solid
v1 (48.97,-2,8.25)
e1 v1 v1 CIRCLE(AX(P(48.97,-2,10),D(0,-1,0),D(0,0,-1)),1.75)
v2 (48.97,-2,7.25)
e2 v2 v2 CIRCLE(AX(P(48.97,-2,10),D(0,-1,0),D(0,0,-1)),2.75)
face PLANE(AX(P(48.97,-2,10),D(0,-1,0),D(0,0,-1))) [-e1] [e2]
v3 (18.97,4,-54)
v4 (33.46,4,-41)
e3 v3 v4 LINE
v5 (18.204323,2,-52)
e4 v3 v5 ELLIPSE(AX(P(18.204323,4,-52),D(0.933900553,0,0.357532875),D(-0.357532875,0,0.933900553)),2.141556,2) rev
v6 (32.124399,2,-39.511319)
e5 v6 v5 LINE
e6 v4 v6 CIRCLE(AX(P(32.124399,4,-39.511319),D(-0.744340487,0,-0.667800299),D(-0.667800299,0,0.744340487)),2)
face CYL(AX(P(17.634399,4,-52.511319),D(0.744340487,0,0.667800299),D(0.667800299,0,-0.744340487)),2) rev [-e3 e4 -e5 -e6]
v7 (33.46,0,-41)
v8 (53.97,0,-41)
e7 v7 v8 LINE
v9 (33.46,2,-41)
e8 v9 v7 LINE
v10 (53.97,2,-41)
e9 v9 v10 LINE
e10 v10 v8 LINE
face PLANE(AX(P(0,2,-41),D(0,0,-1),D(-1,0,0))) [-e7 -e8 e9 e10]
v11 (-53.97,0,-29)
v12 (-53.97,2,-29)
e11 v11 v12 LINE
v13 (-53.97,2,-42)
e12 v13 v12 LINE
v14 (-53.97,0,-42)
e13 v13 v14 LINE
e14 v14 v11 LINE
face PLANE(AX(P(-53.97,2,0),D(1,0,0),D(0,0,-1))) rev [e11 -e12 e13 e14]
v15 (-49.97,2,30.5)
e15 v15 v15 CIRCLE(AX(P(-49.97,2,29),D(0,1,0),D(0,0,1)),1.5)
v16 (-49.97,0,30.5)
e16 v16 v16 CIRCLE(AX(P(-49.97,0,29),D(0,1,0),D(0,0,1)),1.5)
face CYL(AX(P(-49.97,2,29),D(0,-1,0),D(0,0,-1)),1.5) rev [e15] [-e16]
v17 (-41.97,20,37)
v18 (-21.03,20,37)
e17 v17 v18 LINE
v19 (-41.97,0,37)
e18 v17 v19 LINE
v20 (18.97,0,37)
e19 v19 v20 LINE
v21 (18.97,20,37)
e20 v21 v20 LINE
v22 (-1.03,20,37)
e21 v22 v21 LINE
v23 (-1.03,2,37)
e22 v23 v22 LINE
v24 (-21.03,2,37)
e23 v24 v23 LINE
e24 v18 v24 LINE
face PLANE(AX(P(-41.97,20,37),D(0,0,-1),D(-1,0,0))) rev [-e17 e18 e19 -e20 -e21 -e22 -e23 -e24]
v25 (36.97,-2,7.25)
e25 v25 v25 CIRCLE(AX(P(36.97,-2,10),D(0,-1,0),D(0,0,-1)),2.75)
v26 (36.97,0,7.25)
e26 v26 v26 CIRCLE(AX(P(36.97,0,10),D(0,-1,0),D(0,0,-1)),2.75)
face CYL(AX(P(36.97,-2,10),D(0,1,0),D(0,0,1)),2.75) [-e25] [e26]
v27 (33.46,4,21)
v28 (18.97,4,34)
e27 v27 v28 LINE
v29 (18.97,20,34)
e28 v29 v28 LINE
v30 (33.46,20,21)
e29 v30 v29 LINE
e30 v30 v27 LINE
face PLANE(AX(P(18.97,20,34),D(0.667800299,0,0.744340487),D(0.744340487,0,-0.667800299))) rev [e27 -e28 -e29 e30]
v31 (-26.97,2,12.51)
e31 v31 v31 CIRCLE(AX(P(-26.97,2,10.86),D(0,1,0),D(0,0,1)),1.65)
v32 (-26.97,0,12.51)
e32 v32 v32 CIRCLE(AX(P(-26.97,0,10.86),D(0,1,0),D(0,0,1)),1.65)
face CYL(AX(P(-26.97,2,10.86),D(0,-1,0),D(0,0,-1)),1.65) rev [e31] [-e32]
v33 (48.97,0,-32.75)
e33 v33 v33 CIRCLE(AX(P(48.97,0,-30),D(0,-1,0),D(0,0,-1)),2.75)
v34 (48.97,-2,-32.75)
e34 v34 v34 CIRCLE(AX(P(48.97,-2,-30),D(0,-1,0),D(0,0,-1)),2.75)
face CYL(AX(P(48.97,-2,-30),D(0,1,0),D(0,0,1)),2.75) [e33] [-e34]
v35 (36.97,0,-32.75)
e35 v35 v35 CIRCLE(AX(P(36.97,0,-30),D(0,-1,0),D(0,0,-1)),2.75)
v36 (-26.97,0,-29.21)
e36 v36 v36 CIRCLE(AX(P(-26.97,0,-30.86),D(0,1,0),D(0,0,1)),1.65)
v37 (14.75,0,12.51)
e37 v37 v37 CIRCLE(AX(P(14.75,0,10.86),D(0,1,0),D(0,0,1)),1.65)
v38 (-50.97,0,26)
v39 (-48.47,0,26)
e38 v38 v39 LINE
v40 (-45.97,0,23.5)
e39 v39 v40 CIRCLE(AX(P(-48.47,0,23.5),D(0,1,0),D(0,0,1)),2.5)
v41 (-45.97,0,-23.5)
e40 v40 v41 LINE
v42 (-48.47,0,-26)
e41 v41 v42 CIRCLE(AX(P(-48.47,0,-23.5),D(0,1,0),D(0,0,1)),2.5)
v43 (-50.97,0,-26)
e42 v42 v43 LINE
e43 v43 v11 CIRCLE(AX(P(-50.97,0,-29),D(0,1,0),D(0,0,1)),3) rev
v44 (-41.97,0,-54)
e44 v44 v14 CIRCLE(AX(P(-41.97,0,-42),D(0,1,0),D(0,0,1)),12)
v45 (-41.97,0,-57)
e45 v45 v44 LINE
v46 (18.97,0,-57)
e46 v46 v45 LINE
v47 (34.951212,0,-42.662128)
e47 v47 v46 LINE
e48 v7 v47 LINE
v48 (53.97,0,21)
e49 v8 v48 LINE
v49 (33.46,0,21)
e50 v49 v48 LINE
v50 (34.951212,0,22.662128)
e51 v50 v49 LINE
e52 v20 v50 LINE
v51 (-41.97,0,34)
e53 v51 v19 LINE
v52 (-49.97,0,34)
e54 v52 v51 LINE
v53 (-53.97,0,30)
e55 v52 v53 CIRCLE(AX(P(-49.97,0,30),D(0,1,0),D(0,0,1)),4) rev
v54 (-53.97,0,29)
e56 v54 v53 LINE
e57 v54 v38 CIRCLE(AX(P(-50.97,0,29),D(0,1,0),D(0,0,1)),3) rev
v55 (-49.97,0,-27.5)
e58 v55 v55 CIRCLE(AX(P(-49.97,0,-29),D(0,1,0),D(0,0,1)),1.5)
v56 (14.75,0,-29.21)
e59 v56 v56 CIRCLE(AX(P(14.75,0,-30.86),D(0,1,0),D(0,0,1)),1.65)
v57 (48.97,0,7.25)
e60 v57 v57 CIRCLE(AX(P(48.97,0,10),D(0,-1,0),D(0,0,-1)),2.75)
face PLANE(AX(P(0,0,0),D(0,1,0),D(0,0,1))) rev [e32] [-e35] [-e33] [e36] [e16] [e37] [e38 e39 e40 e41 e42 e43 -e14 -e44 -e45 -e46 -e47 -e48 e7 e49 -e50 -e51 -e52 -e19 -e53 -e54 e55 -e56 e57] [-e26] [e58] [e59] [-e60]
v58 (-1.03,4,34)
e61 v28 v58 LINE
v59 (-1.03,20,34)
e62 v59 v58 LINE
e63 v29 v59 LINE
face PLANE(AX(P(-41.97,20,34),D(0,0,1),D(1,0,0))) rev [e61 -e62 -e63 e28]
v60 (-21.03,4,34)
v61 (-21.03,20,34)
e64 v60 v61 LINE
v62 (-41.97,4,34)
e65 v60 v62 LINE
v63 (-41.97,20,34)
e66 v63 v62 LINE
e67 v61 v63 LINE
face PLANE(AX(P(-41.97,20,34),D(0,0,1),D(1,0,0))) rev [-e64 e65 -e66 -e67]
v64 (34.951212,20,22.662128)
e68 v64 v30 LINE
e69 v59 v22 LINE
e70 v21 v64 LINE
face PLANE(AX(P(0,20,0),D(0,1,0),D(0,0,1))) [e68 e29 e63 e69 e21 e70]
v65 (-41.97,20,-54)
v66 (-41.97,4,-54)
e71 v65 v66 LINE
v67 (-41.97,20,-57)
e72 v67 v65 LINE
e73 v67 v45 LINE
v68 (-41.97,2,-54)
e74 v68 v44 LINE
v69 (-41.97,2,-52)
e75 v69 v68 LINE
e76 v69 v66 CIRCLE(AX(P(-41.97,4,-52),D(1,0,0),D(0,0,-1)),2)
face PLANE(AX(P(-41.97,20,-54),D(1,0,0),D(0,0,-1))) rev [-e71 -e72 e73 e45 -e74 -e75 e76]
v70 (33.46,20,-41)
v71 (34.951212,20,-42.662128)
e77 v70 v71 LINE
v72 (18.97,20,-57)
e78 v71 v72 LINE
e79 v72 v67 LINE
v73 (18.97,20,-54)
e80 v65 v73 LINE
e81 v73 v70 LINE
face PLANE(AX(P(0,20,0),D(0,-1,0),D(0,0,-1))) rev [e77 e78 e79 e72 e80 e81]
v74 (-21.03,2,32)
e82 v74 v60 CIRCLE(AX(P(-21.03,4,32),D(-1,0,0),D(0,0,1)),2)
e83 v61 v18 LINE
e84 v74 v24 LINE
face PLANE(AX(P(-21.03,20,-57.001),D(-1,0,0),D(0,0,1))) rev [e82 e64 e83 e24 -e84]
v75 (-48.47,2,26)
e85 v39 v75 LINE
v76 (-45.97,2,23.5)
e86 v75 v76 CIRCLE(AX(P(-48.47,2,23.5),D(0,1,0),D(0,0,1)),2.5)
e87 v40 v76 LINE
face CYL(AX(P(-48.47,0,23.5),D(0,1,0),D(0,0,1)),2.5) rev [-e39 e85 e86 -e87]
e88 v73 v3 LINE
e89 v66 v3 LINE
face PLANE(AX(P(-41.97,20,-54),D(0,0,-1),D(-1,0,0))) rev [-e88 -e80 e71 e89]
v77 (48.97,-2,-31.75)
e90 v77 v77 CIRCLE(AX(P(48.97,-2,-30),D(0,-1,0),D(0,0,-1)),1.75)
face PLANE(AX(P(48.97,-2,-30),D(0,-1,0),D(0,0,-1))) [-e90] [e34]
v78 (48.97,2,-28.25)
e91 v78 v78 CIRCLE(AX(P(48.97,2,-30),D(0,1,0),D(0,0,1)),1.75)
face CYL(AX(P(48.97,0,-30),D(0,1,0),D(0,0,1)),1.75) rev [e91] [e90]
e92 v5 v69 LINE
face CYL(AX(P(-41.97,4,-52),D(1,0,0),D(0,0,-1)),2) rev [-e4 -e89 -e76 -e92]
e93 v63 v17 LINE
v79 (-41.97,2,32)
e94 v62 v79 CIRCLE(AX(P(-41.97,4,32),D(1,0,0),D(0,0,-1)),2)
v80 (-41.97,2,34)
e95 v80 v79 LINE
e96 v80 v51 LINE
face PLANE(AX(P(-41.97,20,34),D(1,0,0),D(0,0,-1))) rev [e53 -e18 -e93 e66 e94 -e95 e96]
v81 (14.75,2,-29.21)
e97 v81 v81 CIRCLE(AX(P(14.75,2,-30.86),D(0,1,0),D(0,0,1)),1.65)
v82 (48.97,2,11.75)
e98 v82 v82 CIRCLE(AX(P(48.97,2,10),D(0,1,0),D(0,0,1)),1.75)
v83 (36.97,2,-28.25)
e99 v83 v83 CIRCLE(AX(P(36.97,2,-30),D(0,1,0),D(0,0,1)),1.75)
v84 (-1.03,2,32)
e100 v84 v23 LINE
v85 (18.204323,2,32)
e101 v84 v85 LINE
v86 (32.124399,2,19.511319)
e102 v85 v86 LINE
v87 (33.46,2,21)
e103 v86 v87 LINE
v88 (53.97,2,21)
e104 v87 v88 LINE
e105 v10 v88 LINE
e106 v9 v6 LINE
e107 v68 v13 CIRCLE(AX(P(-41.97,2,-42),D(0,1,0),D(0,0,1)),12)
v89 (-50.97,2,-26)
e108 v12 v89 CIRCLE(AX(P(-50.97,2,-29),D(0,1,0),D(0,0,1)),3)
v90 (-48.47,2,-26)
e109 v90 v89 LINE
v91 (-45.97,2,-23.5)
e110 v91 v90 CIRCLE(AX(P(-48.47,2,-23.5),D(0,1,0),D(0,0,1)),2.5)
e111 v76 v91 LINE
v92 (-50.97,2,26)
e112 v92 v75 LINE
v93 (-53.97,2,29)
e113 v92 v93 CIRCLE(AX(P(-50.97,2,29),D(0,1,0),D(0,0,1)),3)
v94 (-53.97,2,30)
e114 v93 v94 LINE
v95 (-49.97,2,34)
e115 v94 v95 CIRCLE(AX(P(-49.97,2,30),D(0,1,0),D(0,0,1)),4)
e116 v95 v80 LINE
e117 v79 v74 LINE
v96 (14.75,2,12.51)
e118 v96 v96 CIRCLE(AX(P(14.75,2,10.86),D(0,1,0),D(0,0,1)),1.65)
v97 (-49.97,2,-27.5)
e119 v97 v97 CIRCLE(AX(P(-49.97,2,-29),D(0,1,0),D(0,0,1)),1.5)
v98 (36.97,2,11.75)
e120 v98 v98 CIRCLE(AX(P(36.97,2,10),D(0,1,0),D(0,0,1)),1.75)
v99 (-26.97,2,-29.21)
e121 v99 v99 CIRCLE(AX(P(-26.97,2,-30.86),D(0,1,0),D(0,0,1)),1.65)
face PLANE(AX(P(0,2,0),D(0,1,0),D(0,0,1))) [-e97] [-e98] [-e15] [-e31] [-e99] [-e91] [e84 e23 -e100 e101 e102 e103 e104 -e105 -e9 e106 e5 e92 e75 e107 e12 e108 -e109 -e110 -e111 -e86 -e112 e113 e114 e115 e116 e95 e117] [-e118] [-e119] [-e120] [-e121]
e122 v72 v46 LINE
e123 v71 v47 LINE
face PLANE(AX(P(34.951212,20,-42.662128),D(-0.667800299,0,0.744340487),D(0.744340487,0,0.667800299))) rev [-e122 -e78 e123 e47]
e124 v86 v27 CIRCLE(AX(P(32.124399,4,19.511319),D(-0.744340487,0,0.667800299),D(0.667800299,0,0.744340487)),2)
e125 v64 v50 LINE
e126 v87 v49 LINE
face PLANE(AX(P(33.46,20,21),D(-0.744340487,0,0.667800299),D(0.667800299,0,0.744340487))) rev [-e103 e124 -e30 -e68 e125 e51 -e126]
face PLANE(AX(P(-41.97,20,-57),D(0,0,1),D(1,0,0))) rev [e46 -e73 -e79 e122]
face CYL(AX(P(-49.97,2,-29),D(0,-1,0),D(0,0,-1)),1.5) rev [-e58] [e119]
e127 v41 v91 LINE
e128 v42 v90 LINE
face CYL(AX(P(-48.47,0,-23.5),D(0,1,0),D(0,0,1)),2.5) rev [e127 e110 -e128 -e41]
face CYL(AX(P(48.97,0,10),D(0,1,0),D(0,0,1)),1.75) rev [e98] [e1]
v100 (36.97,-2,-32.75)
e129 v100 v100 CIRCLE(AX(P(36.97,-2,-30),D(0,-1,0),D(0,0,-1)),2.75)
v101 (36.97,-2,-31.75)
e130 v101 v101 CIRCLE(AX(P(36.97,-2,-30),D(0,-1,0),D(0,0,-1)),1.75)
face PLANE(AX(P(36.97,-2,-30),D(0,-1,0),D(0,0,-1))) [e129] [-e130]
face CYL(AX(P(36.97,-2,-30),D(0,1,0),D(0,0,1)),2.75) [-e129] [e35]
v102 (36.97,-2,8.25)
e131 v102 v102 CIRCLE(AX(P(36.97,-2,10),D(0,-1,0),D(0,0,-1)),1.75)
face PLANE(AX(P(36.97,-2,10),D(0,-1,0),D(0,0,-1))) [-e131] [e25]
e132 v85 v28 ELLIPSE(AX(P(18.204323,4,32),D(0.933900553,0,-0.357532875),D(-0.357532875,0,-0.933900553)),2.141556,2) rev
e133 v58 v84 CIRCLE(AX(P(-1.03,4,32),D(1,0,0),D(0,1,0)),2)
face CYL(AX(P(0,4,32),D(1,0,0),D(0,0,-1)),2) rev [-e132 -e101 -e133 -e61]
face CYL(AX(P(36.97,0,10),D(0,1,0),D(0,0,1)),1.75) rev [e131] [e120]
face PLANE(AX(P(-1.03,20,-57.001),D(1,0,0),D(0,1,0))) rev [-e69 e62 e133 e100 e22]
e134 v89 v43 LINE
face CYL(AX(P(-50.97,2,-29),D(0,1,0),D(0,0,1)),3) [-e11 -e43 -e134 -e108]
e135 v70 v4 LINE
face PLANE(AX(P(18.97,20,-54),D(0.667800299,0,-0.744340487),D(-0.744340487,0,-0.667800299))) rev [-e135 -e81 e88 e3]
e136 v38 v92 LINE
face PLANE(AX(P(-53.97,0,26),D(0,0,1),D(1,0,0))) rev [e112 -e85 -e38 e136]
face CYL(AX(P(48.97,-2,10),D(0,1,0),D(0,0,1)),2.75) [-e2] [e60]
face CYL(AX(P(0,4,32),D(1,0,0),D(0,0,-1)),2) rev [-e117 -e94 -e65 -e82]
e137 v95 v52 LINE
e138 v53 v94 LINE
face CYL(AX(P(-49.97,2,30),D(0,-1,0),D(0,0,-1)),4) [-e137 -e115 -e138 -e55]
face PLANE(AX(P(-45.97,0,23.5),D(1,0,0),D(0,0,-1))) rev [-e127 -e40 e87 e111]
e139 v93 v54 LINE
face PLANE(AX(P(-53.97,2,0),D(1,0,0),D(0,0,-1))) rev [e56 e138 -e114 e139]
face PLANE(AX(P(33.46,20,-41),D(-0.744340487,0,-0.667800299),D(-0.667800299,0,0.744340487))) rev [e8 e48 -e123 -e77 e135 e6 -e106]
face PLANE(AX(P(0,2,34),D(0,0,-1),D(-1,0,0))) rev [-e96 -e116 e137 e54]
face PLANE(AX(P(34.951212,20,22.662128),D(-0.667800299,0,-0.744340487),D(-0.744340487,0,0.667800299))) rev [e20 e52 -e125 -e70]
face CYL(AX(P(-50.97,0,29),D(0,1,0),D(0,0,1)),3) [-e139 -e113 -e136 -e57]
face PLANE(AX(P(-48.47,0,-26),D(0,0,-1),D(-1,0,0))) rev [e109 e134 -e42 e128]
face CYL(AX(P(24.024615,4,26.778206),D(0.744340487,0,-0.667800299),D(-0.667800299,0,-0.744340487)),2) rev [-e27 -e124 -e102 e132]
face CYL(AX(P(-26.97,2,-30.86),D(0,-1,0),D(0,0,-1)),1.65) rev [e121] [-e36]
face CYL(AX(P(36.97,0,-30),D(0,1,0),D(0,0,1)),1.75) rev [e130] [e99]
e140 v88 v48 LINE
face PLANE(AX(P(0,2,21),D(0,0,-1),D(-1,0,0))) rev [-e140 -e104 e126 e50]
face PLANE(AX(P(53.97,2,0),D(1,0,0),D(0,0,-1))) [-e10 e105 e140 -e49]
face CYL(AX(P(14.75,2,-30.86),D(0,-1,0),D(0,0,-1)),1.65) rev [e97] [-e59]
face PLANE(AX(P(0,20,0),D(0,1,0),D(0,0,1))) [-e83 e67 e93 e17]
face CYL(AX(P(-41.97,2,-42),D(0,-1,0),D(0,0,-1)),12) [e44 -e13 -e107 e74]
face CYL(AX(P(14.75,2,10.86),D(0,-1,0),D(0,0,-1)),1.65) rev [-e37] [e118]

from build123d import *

# Parameters (mm, degrees)
CROQUIS1_R              = 1.5
CROQUIS1_R_2            = 1.65
SALIENTE_EXTRUIR1_DEPTH = 2
REDONDEO1_R             = 4
CORTAR_EXTRUIR1_DEPTH   = 77.372514035
REDONDEO2_R             = 3
CROQUIS5_R              = 1.75
CORTAR_EXTRUIR2_DEPTH   = 77.372514035
CROQUIS6_R              = 2.75
CROQUIS6_R_2            = 1.75
SALIENTE_EXTRUIR6_DEPTH = 2
SALIENTE_EXTRUIR7_DEPTH = 20
CORTAR_EXTRUIR3_REACH   = 112.221
CROQUIS8_W              = 20
CROQUIS8_H              = 18
REDONDEO3_R             = 2


with BuildPart() as part:
    # Croquis1 → Saliente-Extruir1 (new body)
    with BuildSketch(Plane(origin=(0, 0, 0), x_dir=(1, 0, 0), z_dir=(0, 1, 0))):
        with BuildLine():
            Line((33.46, 41), (18.97, 54))
            Line((18.97, 54), (-41.97, 54))
            ThreePointArc((-41.97, 54), (-50.455281374, 50.485281374), (-53.97, 42))
            Line((-53.97, 42), (-53.97, -34))
            Line((-53.97, -34), (18.97, -34))
            Line((18.97, -34), (33.46, -21))
            Line((33.46, -21), (53.97, -21))
            Line((53.97, -21), (53.97, 7.59309581))
            Line((53.97, 7.59309581), (53.97, 12.40690419))
            Line((53.97, 12.40690419), (53.97, 41))
            Line((53.97, 41), (33.46, 41))
        make_face()
        with Locations(Location((-49.97, -29, 0), (0, 0, 270))):
            Circle(CROQUIS1_R, mode=Mode.SUBTRACT)
        with Locations(Location((-26.97, -10.86, 0), (0, 0, 270))):
            Circle(CROQUIS1_R_2, mode=Mode.SUBTRACT)
        with Locations(Location((14.75, -10.86, 0), (0, 0, 270))):
            Circle(CROQUIS1_R_2, mode=Mode.SUBTRACT)
        with Locations(Location((-49.97, 29, 0), (0, 0, 270))):
            Circle(CROQUIS1_R, mode=Mode.SUBTRACT)
        with Locations(Location((-26.97, 30.86, 0), (0, 0, 270))):
            Circle(CROQUIS1_R_2, mode=Mode.SUBTRACT)
        with Locations(Location((14.75, 30.86, 0), (0, 0, 270))):
            Circle(CROQUIS1_R_2, mode=Mode.SUBTRACT)
    extrude(amount=SALIENTE_EXTRUIR1_DEPTH)

    # Redondeo1
    redondeo1_edges = [part.edges().sort_by_distance(p)[0] for p in [
        (-53.97, 1, 34),
    ]]
    fillet(redondeo1_edges, radius=REDONDEO1_R)

    # Croquis4 → Cortar-Extruir1 (cut, through all)
    with BuildSketch(Plane(origin=(0, 2, 0), x_dir=(1, 0, 0), z_dir=(0, 1, 0))):
        with BuildLine():
            Line((-53.97, 26), (-53.97, -26))
            Line((-53.97, -26), (-48.47, -26))
            ThreePointArc((-48.47, -26), (-46.702233047, -25.267766953), (-45.97, -23.5))
            Line((-45.97, -23.5), (-45.97, 23.5))
            ThreePointArc((-45.97, 23.5), (-46.702233047, 25.267766953), (-48.47, 26))
            Line((-48.47, 26), (-53.97, 26))
        make_face()
    extrude(amount=-CORTAR_EXTRUIR1_DEPTH, mode=Mode.SUBTRACT)

    # Redondeo2
    redondeo2_edges = [part.edges().sort_by_distance(p)[0] for p in [
        (-53.97, 1, -26),
        (-53.97, 1, 26),
    ]]
    fillet(redondeo2_edges, radius=REDONDEO2_R)

    # Croquis5 → Cortar-Extruir2 (cut, through all)
    with BuildSketch(Plane(origin=(0, 2, 0), x_dir=(1, 0, 0), z_dir=(0, 1, 0))):
        with Locations(Location((36.97, 30, 0), (0, 0, 270))):
            Circle(CROQUIS5_R)
        with Locations(Location((36.97, -10, 0), (0, 0, 270))):
            Circle(CROQUIS5_R)
        with Locations(Location((48.97, 30, 0), (0, 0, 270))):
            Circle(CROQUIS5_R)
        with Locations(Location((48.97, -10, 0), (0, 0, 270))):
            Circle(CROQUIS5_R)
    extrude(amount=-CORTAR_EXTRUIR2_DEPTH, mode=Mode.SUBTRACT)

    # Croquis6 → Saliente-Extruir6 (add)
    # profile 1 of 4: a face of its own
    with BuildSketch(Plane.XZ):
        with Locations(Location((36.97, 10, 0), (0, 0, 270))):
            Circle(CROQUIS6_R)
        with Locations(Location((36.97, 10, 0), (0, 0, 90))):
            Circle(CROQUIS6_R_2, mode=Mode.SUBTRACT)
    # profile 2 of 4: a face of its own
    with BuildSketch(Plane.XZ):
        with Locations(Location((36.97, -30, 0), (0, 0, 270))):
            Circle(CROQUIS6_R)
        with Locations(Location((36.97, -30, 0), (0, 0, 90))):
            Circle(CROQUIS6_R_2, mode=Mode.SUBTRACT)
    # profile 3 of 4: a face of its own
    with BuildSketch(Plane.XZ):
        with Locations(Location((48.97, -30, 0), (0, 0, 270))):
            Circle(CROQUIS6_R)
        with Locations(Location((48.97, -30, 0), (0, 0, 90))):
            Circle(CROQUIS6_R_2, mode=Mode.SUBTRACT)
    # profile 4 of 4: a face of its own
    with BuildSketch(Plane.XZ):
        with Locations(Location((48.97, 10, 0), (0, 0, 270))):
            Circle(CROQUIS6_R)
        with Locations(Location((48.97, 10, 0), (0, 0, 90))):
            Circle(CROQUIS6_R_2, mode=Mode.SUBTRACT)
    extrude(amount=SALIENTE_EXTRUIR6_DEPTH)

    # Croquis7 → Saliente-Extruir7 (add)
    with BuildSketch(Plane(origin=(0, 0, 0), x_dir=(1, 0, 0), z_dir=(0, 1, 0))):
        Polygon((-41.97, -34), (18.97, -34), (33.46, -21), (34.951212399, -22.662128282), (18.97, -37), (-41.97, -37), align=None)
        Polygon((-41.97, 54), (18.97, 54), (33.46, 41), (34.951212399, 42.662128282), (18.97, 57), (-41.97, 57), align=None)
    extrude(amount=SALIENTE_EXTRUIR7_DEPTH)

    # Croquis8 → Cortar-Extruir3 (cut, up to next)
    with BuildSketch(Plane.XY.offset(37), mode=Mode.PRIVATE) as cortar_extruir3_sk1:
        with Locations((-11.03, 11)):
            Rectangle(CROQUIS8_W, CROQUIS8_H)
    cortar_extruir3_tool1 = extrude(cortar_extruir3_sk1.sketch, amount=-CORTAR_EXTRUIR3_REACH, mode=Mode.PRIVATE) & part.part
    add(cortar_extruir3_tool1.solids().sort_by_distance((-11.03, 11, 37))[0], mode=Mode.SUBTRACT)

    # Redondeo3
    # the kernel refuses this fillet: 2 mm, written as the material it adds along each edge
    with BuildSketch(Plane(origin=(-41.97, 2, 34), x_dir=(0, 0, -1), z_dir=(1, 0, 0))) as redondeo3_piece_1:
        with BuildLine():
            CenterArc((REDONDEO3_R, REDONDEO3_R), REDONDEO3_R, 180, 90)
            Line((0, REDONDEO3_R), (0, 0))
            Line((0, 0), (REDONDEO3_R, 0))
        make_face()
    extrude(amount=20.94)
    with BuildSketch(Plane(origin=(-1.03, 2, 34), x_dir=(0, 0, -1), z_dir=(1, 0, 0))) as redondeo3_piece_2_section:
        with BuildLine():
            CenterArc((REDONDEO3_R, REDONDEO3_R), REDONDEO3_R, 180, 90)
            Line((0, REDONDEO3_R), (0, 0))
            Line((0, 0), (REDONDEO3_R, 0))
        make_face()
    redondeo3_piece_2 = extrude(amount=25, mode=Mode.PRIVATE)
    redondeo3_piece_2 = split(redondeo3_piece_2, bisect_by=Plane(origin=(13.795733926, 2.442237096, 38.642198686), z_dir=(-0.6678002989650054, 0, -0.7443404870771505)), keep=Keep.TOP, mode=Mode.PRIVATE)
    add(redondeo3_piece_2)
    with BuildSketch(Plane(origin=(23.97, 2, -54), x_dir=(0, 0, 1), z_dir=(-1, 0, 0))) as redondeo3_piece_3_section:
        with BuildLine():
            CenterArc((REDONDEO3_R, REDONDEO3_R), REDONDEO3_R, 180, 90)
            Line((0, REDONDEO3_R), (0, 0))
            Line((0, 0), (REDONDEO3_R, 0))
        make_face()
    redondeo3_piece_3 = extrude(amount=65.94, mode=Mode.PRIVATE)
    redondeo3_piece_3 = split(redondeo3_piece_3, bisect_by=Plane(origin=(3.244998738, 2.450659897, -68.108006653), z_dir=(-0.6678002989650061, 0, 0.7443404870771497)), keep=Keep.TOP, mode=Mode.PRIVATE)
    add(redondeo3_piece_3)
    with BuildSketch(Plane(origin=(15.248297565, 2, 37.339001495), x_dir=(-0.6678002989650055, 0, -0.7443404870771503), z_dir=(0.7443404870771504, 0, -0.6678002989650055))) as redondeo3_piece_4_section:
        with BuildLine():
            CenterArc((REDONDEO3_R, REDONDEO3_R), REDONDEO3_R, 180, 90)
            Line((0, REDONDEO3_R), (0, 0))
            Line((0, 0), (REDONDEO3_R, 0))
        make_face()
    redondeo3_piece_4 = extrude(amount=24.466897544, mode=Mode.PRIVATE)
    redondeo3_piece_4 = split(redondeo3_piece_4, bisect_by=Plane(origin=(25.546033726, 2.446735878, 34), z_dir=(0, 0, -1)), keep=Keep.TOP, mode=Mode.PRIVATE)
    add(redondeo3_piece_4)
    with BuildSketch(Plane(origin=(33.46, 2, -41), x_dir=(-0.6678002989650058, 0, 0.74434048707715), z_dir=(-0.7443404870771501, 0, -0.6678002989650059))) as redondeo3_piece_5_section:
        with BuildLine():
            CenterArc((REDONDEO3_R, REDONDEO3_R), REDONDEO3_R, 180, 90)
            Line((0, REDONDEO3_R), (0, 0))
            Line((0, 0), (REDONDEO3_R, 0))
        make_face()
    redondeo3_piece_5 = extrude(amount=24.466897544, mode=Mode.PRIVATE)
    redondeo3_piece_5 = split(redondeo3_piece_5, bisect_by=Plane(origin=(32.635535298, 2.26154088, -54), z_dir=(0, 0, 1)), keep=Keep.TOP, mode=Mode.PRIVATE)
    add(redondeo3_piece_5)


solid = part.part
